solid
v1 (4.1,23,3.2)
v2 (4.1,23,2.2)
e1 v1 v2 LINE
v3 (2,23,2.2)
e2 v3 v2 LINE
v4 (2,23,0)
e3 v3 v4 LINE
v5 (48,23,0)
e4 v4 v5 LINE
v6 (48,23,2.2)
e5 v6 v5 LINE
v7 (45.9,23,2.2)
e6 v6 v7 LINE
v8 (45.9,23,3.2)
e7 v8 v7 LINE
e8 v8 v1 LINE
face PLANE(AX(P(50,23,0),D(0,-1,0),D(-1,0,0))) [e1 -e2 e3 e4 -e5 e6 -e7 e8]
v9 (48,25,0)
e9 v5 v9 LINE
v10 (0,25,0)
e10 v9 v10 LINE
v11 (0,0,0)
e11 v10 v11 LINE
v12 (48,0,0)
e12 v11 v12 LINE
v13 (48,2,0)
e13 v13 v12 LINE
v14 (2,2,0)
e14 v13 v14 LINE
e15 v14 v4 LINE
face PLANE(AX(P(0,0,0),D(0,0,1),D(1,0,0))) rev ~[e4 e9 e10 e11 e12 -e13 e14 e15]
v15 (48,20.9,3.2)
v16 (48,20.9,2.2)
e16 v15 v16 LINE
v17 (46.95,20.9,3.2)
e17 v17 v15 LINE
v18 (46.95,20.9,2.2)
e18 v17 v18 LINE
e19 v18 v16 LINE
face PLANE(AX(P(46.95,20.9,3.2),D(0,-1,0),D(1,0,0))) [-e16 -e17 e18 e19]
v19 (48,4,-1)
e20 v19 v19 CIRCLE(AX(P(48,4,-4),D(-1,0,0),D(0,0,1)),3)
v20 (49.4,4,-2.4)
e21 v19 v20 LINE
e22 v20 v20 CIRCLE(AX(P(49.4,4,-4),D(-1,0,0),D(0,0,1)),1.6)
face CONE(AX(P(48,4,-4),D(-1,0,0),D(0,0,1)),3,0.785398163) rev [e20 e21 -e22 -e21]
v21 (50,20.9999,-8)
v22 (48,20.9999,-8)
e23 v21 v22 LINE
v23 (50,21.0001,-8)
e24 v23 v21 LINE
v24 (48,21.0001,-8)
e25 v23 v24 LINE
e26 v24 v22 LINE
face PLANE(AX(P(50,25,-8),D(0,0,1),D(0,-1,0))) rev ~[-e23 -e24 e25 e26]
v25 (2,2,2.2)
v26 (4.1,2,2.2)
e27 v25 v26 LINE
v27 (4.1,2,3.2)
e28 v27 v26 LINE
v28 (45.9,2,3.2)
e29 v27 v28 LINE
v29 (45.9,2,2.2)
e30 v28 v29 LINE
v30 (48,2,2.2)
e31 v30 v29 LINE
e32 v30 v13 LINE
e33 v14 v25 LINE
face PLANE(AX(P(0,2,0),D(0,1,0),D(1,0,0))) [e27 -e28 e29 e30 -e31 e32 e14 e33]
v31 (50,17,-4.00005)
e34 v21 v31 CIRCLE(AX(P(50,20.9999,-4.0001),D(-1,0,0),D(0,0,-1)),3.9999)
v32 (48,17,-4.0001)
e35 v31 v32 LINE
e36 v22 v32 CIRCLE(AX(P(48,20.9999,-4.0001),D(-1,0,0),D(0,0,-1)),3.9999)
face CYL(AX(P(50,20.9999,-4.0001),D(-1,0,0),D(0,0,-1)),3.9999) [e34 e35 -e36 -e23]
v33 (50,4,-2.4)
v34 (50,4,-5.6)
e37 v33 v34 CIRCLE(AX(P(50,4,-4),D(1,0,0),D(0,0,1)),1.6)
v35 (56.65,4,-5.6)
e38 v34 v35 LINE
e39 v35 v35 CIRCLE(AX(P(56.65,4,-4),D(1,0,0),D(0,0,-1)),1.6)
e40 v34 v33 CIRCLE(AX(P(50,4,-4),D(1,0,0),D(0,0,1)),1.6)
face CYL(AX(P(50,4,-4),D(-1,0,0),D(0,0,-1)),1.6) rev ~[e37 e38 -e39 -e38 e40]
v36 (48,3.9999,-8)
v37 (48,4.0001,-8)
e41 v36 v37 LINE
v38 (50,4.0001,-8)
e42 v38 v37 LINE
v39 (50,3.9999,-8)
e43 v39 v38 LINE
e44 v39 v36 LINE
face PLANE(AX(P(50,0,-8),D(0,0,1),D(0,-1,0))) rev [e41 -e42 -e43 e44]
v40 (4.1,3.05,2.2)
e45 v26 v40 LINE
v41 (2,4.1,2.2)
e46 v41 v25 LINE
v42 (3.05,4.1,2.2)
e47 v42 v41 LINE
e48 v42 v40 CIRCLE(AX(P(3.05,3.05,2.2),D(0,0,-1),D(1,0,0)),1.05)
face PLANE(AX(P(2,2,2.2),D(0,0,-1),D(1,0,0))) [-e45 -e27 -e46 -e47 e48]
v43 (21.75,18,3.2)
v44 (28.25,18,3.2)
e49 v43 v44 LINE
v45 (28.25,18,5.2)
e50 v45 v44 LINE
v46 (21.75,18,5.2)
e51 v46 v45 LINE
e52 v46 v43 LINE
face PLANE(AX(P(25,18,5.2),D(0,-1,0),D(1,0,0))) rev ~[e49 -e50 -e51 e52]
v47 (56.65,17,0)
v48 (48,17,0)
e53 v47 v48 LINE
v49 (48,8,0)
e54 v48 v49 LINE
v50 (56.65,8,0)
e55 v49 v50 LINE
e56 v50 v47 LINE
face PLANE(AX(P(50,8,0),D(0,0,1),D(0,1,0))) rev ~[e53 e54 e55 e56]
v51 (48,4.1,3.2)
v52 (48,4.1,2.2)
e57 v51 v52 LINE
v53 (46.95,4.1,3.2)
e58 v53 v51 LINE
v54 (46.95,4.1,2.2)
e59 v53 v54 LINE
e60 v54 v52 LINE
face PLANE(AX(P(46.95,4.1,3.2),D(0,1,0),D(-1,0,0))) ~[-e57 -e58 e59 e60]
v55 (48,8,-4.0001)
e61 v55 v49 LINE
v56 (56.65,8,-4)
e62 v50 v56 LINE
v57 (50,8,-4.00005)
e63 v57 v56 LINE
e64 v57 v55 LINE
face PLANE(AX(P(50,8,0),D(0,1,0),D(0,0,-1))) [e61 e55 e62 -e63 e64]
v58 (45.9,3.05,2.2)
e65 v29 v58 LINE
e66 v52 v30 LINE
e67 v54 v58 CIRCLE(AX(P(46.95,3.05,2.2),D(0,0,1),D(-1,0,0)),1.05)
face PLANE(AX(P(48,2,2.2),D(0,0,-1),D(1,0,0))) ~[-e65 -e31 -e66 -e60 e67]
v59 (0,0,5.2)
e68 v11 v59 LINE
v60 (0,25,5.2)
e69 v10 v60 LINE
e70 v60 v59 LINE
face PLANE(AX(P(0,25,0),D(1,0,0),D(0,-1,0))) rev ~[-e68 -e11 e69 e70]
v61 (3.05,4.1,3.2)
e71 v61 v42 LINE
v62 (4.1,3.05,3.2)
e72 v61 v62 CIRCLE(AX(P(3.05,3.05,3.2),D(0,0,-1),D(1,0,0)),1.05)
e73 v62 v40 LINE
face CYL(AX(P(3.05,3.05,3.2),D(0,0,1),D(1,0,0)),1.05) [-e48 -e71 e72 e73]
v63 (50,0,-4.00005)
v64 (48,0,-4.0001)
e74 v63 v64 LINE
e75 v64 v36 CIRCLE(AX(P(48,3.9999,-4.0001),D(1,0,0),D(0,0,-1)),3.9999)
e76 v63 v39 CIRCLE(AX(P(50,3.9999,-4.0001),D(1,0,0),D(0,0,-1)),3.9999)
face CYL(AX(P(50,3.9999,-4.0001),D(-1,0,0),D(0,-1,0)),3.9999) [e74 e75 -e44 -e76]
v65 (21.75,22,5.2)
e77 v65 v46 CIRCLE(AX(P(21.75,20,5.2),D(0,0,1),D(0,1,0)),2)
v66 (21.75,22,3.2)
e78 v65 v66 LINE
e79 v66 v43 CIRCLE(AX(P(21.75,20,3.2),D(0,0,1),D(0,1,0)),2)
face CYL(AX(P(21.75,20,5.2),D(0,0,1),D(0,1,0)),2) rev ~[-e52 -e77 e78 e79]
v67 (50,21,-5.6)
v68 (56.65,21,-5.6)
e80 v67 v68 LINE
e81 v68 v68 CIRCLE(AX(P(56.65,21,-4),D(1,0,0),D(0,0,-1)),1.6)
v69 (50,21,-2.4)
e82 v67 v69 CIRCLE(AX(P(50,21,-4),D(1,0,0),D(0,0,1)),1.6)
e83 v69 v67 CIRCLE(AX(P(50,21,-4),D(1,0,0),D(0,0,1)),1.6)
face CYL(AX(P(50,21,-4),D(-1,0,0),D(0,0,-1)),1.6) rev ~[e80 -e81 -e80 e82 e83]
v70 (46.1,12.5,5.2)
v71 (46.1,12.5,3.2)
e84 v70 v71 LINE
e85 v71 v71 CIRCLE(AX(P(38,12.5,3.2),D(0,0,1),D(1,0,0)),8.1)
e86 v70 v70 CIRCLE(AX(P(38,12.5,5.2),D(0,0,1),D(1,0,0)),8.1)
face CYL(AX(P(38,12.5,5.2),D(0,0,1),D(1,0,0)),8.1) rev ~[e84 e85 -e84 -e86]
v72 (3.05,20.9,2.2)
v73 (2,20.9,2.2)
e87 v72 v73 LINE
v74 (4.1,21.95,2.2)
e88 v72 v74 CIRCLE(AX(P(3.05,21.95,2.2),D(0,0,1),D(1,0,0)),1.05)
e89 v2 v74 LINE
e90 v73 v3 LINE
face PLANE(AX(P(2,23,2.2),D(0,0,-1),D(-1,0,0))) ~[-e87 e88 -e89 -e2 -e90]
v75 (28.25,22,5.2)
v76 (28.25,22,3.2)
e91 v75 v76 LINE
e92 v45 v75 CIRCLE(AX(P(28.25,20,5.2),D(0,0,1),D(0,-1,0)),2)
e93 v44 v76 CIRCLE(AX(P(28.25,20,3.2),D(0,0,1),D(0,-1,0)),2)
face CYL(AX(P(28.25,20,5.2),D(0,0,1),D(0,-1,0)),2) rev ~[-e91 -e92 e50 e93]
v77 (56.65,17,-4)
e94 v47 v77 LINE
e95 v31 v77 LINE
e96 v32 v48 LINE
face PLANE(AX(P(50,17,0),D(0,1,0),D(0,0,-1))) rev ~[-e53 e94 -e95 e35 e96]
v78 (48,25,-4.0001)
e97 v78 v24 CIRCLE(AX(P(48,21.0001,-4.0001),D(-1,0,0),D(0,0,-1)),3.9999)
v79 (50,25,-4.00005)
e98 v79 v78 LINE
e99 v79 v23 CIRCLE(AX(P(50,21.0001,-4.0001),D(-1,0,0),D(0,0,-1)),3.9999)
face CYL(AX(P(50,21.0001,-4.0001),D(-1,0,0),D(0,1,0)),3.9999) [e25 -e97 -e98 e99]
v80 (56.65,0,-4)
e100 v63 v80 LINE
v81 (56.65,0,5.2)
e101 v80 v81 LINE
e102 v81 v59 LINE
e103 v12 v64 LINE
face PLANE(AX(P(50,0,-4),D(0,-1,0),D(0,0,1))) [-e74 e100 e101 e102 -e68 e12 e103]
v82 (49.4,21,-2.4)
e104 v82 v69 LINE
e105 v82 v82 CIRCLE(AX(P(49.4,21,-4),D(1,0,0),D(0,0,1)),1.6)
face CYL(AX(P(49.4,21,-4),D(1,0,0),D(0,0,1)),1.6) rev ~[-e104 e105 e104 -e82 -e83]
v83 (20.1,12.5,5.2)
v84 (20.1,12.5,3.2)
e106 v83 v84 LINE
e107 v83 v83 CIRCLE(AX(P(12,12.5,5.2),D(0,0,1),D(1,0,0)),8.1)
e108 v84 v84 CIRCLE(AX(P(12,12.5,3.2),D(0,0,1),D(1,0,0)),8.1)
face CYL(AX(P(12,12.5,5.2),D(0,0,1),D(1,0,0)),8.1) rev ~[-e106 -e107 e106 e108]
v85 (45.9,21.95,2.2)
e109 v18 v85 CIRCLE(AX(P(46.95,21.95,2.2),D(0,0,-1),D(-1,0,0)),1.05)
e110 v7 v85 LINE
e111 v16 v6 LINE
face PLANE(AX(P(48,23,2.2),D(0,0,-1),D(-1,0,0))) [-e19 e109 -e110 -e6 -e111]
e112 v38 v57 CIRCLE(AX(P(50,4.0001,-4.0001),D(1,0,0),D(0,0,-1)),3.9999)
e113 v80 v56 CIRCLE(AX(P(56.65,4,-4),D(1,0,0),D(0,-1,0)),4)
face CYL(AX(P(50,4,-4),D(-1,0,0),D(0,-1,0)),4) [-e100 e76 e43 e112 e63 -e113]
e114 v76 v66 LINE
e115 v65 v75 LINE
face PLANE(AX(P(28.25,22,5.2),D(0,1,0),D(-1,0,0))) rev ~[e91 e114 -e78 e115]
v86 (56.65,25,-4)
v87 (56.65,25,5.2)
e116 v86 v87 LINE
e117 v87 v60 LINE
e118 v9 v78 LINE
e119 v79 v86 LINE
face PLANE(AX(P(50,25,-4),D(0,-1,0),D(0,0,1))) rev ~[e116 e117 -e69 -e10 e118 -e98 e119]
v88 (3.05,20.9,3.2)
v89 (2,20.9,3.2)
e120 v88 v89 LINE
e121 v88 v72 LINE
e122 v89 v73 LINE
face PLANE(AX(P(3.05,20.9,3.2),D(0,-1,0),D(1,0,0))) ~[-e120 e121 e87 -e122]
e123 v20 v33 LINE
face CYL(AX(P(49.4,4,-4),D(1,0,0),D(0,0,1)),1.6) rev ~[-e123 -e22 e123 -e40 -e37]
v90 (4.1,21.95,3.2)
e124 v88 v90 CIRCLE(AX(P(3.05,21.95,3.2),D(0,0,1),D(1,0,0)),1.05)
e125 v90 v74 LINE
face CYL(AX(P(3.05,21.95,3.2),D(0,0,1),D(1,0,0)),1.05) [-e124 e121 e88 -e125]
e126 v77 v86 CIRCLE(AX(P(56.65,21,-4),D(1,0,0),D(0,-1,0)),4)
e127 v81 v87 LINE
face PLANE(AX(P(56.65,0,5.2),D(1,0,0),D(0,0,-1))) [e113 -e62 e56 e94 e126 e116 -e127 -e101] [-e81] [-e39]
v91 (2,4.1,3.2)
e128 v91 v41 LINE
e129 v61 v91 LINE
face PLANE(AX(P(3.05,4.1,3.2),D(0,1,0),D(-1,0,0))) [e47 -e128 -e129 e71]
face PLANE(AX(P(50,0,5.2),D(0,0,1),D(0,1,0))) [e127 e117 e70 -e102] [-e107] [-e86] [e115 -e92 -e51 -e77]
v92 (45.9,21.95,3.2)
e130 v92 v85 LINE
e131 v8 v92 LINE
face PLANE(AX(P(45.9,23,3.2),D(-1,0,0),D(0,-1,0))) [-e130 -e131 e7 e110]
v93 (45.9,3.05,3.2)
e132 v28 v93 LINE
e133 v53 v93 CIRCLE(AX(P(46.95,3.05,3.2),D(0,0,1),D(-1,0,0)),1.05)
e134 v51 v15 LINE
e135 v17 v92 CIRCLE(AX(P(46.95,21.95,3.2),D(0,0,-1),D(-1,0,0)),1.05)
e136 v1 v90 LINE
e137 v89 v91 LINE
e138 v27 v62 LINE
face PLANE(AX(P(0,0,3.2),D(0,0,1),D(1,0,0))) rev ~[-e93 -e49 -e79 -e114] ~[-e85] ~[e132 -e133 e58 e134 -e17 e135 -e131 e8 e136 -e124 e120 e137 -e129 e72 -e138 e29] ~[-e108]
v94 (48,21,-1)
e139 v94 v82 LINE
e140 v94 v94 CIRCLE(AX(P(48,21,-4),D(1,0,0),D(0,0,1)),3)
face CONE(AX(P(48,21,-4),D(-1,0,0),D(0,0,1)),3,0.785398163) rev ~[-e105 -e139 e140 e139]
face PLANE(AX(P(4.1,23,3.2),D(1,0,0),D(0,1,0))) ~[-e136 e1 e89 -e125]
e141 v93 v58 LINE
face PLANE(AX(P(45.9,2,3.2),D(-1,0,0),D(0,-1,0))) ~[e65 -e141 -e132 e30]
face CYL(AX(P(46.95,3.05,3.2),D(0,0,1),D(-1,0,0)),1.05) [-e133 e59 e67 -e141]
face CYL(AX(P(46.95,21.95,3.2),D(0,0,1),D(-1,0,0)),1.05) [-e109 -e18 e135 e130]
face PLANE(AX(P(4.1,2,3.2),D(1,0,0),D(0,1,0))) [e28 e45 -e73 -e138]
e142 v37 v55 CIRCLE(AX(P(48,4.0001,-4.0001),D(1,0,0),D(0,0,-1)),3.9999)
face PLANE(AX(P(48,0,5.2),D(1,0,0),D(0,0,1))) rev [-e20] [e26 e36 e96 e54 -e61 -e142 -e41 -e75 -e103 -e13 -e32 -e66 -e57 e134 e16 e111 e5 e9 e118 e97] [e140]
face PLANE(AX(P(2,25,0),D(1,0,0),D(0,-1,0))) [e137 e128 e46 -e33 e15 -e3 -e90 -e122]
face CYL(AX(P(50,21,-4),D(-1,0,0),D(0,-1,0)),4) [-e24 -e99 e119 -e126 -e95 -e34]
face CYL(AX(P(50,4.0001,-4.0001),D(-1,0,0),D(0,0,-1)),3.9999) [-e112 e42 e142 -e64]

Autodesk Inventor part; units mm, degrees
sketch "Эскиз1" plane through (0, 0, 0) normal (0, 0, 1) x (1, 0, 0)
  line L0 (0, 0) -> (50, 0)
  line L1 (50, 0) -> (50, 25)
  line L2 (50, 25) -> (0, 25)
  line L3 (0, 25) -> (0, 0)
  dimension "d0" = 50
  dimension "d1" = 25
extrude "Выдавливание1" add sketch "Эскиз1" along normal blind 5.2
shell "Оболочка1" thickness 2 removed faces 1 at (16.6667, 16.6667, 0)
sketch "Эскиз2" plane through (0, 0, 5.2) normal (0, 0, 1) x (1, 0, 0)
  line L0 (50, 25) -> (0, 25) projected
  line L1 (25, 25) -> (25, 0)
  line L2 (0, 0) -> (50, 0) projected
  line L3 (25, 12.5) -> (12, 12.5)
  line L4 (0, 25) -> (0, 0) projected
  circle A0 centre (12, 12.5) radius 8.1
  circle A1 centre (38, 12.5) radius 8.1
  line L5 (25, 25) -> (25, 20)
  line L6 (21.75, 20) -> (28.25, 20) construction
  line L7 (21.75, 18) -> (28.25, 18)
  line L8 (28.25, 22) -> (21.75, 22)
  arc A2 (21.75, 22) -> (21.75, 18) centre (21.75, 20) ccw
  arc A3 (28.25, 18) -> (28.25, 22) centre (28.25, 20) ccw
  point P0 (25, 18)
  point P1 (25, 22)
  dimension "d5" = 13
  dimension "d6" = 16.2
  dimension "d9" = 5
  dimension "d10" = 3.25
  dimension "d11" = 4
extrude "Выдавливание2" cut sketch "Эскиз2" against normal through all contours L8 A3 L7 L1 | L1 L7 A2 L8 | A0 | A1
sketch "Эскиз5" plane through (48, 23, 3.2) normal (0, 0, -1) x (-1, 0, 0)
  line L0 (0, 0) -> (1.05, 0)
  line L1 (0, 0) -> (46, 0) projected
  line L2 (1.05, 0) -> (1.05, -1.05)
  circle A0 centre (1.05, -1.05) radius 1.05
  line L3 (2.1, -2.1) -> (0, -2.1)
  line L4 (0, -2.1) -> (0, 0)
  line L5 (0, 0) -> (2.1, 0)
  line L6 (2.1, 0) -> (2.1, -2.1)
  line L7 (2.1, -2.1) -> (0, 0) construction
  line L8 (0, -2.1) -> (2.1, 0) construction
  point P0 (48, -23)
  point P1 (1.05, -2.1)
  point P2 (2.1, -1.05)
  dimension "d17" = 1.05
  dimension "d18" = 1.05
extrude "Выдавливание4" add sketch "Эскиз5" along normal blind 1 contours L0 A0 L4 | L1 L6 A0 | A0 | A0 L3 L4
ref_plane "РабПлоскость1" through (25, 2, 0) normal (1, 0, 0) x (0, 0, -1)
ref_plane "РабПлоскость2" through (2, 12.5, 0) normal (0, -1, 0) x (1, 0, 0)
mirror "Зеркальное отражение1" about plane through (2, 12.5, 0) normal (0, -1, 0) of "Выдавливание4"
mirror "Зеркальное отражение2" about plane through (25, 2, 0) normal (1, 0, 0) of "Выдавливание4", "Зеркальное отражение1"
sketch "Эскиз11" plane through (50, 25, 5.2) normal (1, 0, 0) x (0, 0, -1)
  line L0 (5.2, 0) -> (13.2, 0)
  line L1 (13.2, 0) -> (13.2, -8)
  line L2 (13.2, -8) -> (5.2, -8)
  line L3 (5.2, -8) -> (5.2, 0)
  point P0 (5.2, -25)
  dimension "d53" = 8
  dimension "d54" = 8
extrude "Выдавливание8" add sketch "Эскиз11" against normal blind 2
sketch "Эскиз12" plane through (48, 23, 0) normal (-1, 0, 0) x (0, 0, 1)
  line L0 (-8, -6) -> (0, -6) projected
  line L1 (-4, -6) -> (-4, 2)
  point P0 (0, -23)
  point P1 (-4, -2)
hole "Отверстие3" at (48, 21, -4) direction (1, 0, 0) diameter 3.2 end through all countersink diameter 6 countersink angle 90
ref_plane "РабПлоскость6" through (0, 12.5, 5.2) normal (0, 1, 0) x (1, 0, 0)
mirror "Зеркальное отражение5" about plane through (0, 12.5, 5.2) normal (0, 1, 0) of "Выдавливание8", "Отверстие3"
fillet "Сопряжение3" radius 4 4 edges at (49, 25, -8) (49, 17, -8) (49, 0, -8) (49, 8, -8)
sketch "Эскиз13" plane through (50, 0, 5.2) normal (1, 0, 0) x (0, 0, -1)
  arc A0 (9.2, 0) -> (9.2, 8) centre (9.2, 4) ccw projected
  line L0 (5.2, 8) -> (9.2, 8) projected
  line L1 (5.2, 8) -> (5.2, 17) projected
  line L2 (5.2, 17) -> (9.2, 17) projected
  arc A1 (9.2, 17) -> (9.2, 25) centre (9.2, 21) ccw projected
  line L3 (9.2, 25) -> (0, 25) projected
  line L4 (0, 0) -> (0, 25) projected
  line L5 (9.2, 0) -> (0, 0) projected
  circle A2 centre (9.2, 21) radius 1.6 projected
  circle A3 centre (9.2, 4) radius 1.6 projected
  point P0 (5.2, 0)
extrude "Выдавливание9" add sketch "Эскиз13" along normal blind 6.65
properties part number "Крепление ультрасоника вертикальная"
